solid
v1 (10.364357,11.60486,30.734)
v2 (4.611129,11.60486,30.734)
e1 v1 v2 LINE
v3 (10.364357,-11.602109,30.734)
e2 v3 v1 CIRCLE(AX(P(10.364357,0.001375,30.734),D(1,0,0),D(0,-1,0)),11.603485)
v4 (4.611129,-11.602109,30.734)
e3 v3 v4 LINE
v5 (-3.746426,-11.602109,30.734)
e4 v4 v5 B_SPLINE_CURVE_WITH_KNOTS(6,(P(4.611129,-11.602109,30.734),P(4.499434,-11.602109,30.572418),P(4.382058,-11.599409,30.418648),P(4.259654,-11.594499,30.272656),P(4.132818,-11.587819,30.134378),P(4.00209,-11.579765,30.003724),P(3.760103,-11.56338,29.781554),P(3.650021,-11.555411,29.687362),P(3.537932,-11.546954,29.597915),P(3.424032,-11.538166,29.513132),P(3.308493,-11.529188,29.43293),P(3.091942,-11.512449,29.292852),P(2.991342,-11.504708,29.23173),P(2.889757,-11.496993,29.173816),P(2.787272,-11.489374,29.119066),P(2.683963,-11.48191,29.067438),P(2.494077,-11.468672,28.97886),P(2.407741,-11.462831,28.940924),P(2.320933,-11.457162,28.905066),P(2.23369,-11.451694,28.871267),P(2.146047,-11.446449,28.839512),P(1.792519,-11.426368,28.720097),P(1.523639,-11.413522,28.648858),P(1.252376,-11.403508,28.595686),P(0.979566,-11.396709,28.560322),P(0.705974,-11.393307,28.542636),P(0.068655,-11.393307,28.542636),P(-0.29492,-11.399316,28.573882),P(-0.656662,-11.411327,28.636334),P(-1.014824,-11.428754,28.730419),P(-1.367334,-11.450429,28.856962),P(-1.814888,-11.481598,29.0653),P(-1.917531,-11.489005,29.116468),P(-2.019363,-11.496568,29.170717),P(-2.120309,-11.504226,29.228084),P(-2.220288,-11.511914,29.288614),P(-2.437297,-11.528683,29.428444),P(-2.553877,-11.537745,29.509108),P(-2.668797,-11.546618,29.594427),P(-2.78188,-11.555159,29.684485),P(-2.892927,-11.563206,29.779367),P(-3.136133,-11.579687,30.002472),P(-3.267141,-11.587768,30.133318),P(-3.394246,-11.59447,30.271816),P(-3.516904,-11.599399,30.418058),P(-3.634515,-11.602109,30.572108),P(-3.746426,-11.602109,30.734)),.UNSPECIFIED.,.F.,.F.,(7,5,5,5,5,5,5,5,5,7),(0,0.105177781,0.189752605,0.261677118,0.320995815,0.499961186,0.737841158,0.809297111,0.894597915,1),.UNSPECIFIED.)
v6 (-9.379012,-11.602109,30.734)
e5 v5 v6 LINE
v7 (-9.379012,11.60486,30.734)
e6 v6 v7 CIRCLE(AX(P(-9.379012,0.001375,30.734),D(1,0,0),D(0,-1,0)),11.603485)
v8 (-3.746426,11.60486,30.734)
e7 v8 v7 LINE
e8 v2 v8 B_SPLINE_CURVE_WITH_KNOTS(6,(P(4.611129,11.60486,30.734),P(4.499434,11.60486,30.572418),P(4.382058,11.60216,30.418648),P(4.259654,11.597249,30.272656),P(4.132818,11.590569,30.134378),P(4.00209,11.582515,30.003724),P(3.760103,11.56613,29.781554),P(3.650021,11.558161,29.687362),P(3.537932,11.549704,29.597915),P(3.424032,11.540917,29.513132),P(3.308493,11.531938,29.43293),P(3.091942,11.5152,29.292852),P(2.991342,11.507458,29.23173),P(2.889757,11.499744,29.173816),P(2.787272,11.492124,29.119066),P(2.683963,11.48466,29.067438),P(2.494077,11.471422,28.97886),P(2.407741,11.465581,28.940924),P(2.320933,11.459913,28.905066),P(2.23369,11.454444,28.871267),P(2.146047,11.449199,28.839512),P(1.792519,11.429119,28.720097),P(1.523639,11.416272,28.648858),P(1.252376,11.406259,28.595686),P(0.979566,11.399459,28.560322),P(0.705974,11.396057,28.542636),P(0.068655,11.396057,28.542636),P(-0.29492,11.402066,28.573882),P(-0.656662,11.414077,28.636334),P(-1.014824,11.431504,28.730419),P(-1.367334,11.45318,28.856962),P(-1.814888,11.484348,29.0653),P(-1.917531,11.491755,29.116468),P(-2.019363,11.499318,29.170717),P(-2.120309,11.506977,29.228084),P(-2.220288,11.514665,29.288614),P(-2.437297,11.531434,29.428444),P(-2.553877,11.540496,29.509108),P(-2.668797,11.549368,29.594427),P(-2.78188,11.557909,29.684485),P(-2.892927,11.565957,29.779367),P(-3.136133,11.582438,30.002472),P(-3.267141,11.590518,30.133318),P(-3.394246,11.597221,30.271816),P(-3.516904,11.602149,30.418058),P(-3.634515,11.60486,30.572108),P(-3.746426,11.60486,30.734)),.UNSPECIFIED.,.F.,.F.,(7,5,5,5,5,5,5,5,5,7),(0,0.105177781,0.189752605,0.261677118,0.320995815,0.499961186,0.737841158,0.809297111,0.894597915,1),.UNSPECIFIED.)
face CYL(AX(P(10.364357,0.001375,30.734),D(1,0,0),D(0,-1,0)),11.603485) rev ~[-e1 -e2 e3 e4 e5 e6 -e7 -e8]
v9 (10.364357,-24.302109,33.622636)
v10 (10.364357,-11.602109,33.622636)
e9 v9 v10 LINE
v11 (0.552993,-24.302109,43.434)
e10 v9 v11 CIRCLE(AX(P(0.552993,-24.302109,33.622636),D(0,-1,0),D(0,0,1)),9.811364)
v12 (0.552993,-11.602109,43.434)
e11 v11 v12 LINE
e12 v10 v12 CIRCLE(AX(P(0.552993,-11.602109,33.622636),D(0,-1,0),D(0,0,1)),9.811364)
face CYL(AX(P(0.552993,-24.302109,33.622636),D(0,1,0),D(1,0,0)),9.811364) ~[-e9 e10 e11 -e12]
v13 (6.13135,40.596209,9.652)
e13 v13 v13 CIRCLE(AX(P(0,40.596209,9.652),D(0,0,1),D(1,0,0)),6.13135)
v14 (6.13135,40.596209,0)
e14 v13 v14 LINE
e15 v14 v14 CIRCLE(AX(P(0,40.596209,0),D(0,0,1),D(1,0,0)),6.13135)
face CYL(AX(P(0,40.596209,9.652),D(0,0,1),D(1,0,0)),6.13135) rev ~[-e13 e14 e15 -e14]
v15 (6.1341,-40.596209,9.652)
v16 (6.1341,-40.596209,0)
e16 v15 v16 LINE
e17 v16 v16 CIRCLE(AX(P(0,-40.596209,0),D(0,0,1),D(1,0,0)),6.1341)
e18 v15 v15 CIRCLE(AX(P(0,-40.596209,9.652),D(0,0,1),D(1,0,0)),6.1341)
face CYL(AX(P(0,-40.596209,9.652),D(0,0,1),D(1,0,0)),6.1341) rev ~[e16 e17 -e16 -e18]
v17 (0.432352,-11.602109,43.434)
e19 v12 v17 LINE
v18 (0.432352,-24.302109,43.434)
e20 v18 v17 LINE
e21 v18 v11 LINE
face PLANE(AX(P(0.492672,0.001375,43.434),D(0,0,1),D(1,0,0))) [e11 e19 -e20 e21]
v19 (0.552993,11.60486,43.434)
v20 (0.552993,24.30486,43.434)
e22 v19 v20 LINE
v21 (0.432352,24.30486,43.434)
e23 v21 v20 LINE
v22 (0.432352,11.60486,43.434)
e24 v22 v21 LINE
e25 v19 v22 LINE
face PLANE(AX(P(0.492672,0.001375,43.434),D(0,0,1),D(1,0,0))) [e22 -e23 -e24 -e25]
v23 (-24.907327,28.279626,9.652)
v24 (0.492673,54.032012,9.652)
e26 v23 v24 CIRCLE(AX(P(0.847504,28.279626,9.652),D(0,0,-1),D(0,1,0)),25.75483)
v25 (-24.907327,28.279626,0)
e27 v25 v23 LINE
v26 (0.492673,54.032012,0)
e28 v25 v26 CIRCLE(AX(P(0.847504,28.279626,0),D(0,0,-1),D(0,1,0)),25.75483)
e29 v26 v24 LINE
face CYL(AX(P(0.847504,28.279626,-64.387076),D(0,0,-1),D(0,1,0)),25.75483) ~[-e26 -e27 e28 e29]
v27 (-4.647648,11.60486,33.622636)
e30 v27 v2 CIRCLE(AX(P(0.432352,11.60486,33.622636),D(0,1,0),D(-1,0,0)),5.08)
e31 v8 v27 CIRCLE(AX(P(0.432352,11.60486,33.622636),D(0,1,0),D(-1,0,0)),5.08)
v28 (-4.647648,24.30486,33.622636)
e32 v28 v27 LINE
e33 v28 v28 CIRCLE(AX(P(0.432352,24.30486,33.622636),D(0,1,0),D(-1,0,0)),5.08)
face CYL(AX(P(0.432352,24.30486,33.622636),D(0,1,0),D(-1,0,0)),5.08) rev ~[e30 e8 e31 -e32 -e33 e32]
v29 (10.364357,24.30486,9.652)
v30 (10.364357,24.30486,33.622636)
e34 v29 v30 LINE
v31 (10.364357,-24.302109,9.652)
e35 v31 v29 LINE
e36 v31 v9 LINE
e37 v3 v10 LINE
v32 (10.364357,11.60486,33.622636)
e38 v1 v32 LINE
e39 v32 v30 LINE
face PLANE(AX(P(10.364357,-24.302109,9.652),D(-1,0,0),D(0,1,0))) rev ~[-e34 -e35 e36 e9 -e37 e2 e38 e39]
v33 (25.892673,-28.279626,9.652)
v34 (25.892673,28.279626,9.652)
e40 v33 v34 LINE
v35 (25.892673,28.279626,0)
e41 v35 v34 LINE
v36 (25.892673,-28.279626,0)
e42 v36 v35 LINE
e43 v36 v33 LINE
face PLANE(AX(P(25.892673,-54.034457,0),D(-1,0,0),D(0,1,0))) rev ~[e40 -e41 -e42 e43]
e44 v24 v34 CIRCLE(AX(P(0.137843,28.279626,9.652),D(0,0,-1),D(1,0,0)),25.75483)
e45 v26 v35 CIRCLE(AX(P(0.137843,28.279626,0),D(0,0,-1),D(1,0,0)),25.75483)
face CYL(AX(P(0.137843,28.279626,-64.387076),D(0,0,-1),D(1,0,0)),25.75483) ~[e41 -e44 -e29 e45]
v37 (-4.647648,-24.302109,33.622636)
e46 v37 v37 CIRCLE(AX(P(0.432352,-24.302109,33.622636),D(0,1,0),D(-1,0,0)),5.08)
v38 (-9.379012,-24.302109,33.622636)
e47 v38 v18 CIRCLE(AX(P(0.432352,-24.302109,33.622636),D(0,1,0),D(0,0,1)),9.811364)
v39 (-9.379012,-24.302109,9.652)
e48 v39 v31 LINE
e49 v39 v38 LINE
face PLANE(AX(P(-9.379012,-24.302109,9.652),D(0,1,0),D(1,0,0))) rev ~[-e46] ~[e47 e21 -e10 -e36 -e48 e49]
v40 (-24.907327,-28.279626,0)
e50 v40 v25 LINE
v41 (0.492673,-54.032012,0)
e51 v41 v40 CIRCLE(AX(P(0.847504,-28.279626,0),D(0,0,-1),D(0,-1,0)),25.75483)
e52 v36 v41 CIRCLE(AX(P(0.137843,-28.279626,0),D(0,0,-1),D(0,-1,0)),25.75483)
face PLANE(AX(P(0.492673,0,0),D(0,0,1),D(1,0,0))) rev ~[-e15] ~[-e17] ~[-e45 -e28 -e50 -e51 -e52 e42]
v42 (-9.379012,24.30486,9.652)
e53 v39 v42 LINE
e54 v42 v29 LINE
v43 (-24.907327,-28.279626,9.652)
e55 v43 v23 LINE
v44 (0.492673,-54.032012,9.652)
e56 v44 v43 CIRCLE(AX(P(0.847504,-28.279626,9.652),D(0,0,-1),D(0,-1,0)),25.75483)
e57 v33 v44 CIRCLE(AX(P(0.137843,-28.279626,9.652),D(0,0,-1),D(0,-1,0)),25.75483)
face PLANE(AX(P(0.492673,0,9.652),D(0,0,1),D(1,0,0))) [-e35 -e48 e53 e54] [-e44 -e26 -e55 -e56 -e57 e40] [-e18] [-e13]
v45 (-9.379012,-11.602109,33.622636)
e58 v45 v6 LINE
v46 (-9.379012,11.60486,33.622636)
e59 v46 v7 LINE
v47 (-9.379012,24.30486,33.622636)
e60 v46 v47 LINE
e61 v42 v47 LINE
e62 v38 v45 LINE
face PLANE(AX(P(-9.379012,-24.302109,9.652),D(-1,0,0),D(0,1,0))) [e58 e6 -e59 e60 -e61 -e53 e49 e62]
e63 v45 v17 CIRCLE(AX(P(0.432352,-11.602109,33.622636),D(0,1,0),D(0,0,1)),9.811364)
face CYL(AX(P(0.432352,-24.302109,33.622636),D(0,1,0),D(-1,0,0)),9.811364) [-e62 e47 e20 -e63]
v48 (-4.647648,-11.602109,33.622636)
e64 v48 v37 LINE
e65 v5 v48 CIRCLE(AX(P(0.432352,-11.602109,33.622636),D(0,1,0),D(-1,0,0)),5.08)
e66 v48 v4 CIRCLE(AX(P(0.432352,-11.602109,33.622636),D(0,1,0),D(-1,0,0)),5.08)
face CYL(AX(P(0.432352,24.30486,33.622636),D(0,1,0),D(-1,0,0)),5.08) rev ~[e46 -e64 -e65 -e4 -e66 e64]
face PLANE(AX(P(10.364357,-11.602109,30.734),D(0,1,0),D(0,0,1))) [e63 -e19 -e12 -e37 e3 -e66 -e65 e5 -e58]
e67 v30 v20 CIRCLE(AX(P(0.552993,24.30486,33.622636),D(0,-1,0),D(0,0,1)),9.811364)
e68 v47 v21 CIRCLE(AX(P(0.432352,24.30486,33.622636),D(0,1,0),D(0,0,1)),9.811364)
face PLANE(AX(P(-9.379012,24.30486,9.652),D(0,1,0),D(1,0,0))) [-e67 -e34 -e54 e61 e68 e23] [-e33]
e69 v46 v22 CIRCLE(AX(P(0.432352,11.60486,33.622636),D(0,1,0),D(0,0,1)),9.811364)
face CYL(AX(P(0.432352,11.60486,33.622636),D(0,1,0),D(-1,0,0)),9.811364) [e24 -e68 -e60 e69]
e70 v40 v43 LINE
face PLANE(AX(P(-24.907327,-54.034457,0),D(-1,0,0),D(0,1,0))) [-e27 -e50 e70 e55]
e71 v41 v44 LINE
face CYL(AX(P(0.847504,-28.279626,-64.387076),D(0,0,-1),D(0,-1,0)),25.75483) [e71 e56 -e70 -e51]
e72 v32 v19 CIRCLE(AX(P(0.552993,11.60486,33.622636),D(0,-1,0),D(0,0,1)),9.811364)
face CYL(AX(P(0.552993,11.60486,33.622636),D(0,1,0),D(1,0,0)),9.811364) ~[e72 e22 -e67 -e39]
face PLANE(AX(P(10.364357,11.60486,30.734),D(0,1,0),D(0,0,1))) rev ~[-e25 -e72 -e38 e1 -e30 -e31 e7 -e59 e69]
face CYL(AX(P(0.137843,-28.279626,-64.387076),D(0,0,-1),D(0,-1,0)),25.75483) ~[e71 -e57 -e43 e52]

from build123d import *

# Parameters (mm, degrees)
F0_W        = 50.8
F0_H        = 108.0689131842
F1_DEPTH    = 9.652
F2_T1_DEPTH = 138.426151417
F3_R        = 6.1341
F3_R_2      = 6.1313496656
F4_DEPTH    = 9.653
F5_W        = 19.7433687763
F5_H        = 48.6069692673
F6_DEPTH    = 33.782
F7_W        = 23.2069692673
F7_H        = 12.7
F8_DEPTH    = 35.2726834568
F9_R        = 9.8113639175
F10_R       = 5.08
F11_DEPTH   = 78.3378719873


# Not quite as in the source:
# - a fillet or chamfer that OpenCascade refuses, or shapes differently, is made with other operations: its cross-section is extruded or revolved along the edge and cut away or added


with BuildPart() as f1:
    # F0 (on Top) → F1 (new body)
    with BuildSketch(Plane.XY):
        with Locations((0.4926733673, 0)):
            Rectangle(F0_W, F0_H)
    extrude(amount=F1_DEPTH)

    # F2: fillet of radius 25.7548302834 on 4 edges, made by hand

    # F2_s2 → F2_t1 (cut)
    with BuildSketch(Plane.XY.offset(-64.3870757085)):
        with BuildLine():
            ThreePointArc((25.8926733673, 28.2796263087), (18.3492582256, 46.4910414504), (0.1378430839, 54.0344565921))
            Line((0.1378430839, 54.0344565921), (25.8926733673, 54.0344565921))
            Line((25.8926733673, 54.0344565921), (25.8926733673, 28.2796263087))
        make_face()
        with BuildLine():
            ThreePointArc((0.8475036507, 54.0344565921), (-17.363911491, 46.4910414504), (-24.9073266327, 28.2796263087))
            Line((-24.9073266327, 28.2796263087), (-24.9073266327, 54.0344565921))
            Line((-24.9073266327, 54.0344565921), (0.8475036507, 54.0344565921))
        make_face()
        with BuildLine():
            ThreePointArc((0.1378430839, -54.0344565921), (18.3492582256, -46.4910414504), (25.8926733673, -28.2796263087))
            Line((25.8926733673, -28.2796263087), (25.8926733673, -54.0344565921))
            Line((25.8926733673, -54.0344565921), (0.1378430839, -54.0344565921))
        make_face()
        with BuildLine():
            ThreePointArc((0.8475036507, -54.0344565921), (-17.363911491, -46.4910414504), (-24.9073266327, -28.2796263087))
            Line((-24.9073266327, -28.2796263087), (-24.9073266327, -54.0344565921))
            Line((-24.9073266327, -54.0344565921), (0.8475036507, -54.0344565921))
        make_face()
    extrude(amount=F2_T1_DEPTH, mode=Mode.SUBTRACT)

    # F3 (on face) → F4 (cut, through all)
    with BuildSketch(Plane.XY.offset(9.652)):
        with Locations((0, -40.5962094665)):
            Circle(F3_R)
        with Locations((0, 40.5962094665)):
            Circle(F3_R_2)
    extrude(amount=-F4_DEPTH, mode=Mode.SUBTRACT)

    # F5 (on face) → F6 (join)
    with BuildSketch(Plane.XY.offset(9.652)):
        with Locations((0.4926724359, 0.0013751672)):
            Rectangle(F5_W, F5_H)
    extrude(amount=F6_DEPTH)

    # F7 (on face) → F8 (cut, through all)
    with BuildSketch(Plane.YZ.offset(10.3643568241)):
        with Locations((0.0013751672, 37.084)):
            Rectangle(F7_W, F7_H)
        with BuildLine():
            Line((11.6048598008, 30.734), (-11.6021094665, 30.734))
            ThreePointArc((-11.6021094665, 30.734), (0.0013751672, 19.1305153664), (11.6048598008, 30.734))
        make_face()
    extrude(amount=-F8_DEPTH, mode=Mode.SUBTRACT)

    # F9
    f9_edges = [f1.edges().sort_by_distance(p)[0] for p in [
        (-9.379012, 17.95486, 43.434),
        (10.364357, 17.95486, 43.434),
        (-9.379012, -17.952109, 43.434),
        (10.364357, -17.952109, 43.434),
    ]]
    fillet(f9_edges, radius=F9_R)

    # F10 (on face) → F11 (cut, through all)
    with BuildSketch(Plane(origin=(0, 24.3048598008, 0), x_dir=(-1, 0, 0), z_dir=(0, 1, 0))):
        with Locations((-0.4323519653, 33.6226360825)):
            Circle(F10_R)
    extrude(amount=-F11_DEPTH, mode=Mode.SUBTRACT)


solid = f1.part
